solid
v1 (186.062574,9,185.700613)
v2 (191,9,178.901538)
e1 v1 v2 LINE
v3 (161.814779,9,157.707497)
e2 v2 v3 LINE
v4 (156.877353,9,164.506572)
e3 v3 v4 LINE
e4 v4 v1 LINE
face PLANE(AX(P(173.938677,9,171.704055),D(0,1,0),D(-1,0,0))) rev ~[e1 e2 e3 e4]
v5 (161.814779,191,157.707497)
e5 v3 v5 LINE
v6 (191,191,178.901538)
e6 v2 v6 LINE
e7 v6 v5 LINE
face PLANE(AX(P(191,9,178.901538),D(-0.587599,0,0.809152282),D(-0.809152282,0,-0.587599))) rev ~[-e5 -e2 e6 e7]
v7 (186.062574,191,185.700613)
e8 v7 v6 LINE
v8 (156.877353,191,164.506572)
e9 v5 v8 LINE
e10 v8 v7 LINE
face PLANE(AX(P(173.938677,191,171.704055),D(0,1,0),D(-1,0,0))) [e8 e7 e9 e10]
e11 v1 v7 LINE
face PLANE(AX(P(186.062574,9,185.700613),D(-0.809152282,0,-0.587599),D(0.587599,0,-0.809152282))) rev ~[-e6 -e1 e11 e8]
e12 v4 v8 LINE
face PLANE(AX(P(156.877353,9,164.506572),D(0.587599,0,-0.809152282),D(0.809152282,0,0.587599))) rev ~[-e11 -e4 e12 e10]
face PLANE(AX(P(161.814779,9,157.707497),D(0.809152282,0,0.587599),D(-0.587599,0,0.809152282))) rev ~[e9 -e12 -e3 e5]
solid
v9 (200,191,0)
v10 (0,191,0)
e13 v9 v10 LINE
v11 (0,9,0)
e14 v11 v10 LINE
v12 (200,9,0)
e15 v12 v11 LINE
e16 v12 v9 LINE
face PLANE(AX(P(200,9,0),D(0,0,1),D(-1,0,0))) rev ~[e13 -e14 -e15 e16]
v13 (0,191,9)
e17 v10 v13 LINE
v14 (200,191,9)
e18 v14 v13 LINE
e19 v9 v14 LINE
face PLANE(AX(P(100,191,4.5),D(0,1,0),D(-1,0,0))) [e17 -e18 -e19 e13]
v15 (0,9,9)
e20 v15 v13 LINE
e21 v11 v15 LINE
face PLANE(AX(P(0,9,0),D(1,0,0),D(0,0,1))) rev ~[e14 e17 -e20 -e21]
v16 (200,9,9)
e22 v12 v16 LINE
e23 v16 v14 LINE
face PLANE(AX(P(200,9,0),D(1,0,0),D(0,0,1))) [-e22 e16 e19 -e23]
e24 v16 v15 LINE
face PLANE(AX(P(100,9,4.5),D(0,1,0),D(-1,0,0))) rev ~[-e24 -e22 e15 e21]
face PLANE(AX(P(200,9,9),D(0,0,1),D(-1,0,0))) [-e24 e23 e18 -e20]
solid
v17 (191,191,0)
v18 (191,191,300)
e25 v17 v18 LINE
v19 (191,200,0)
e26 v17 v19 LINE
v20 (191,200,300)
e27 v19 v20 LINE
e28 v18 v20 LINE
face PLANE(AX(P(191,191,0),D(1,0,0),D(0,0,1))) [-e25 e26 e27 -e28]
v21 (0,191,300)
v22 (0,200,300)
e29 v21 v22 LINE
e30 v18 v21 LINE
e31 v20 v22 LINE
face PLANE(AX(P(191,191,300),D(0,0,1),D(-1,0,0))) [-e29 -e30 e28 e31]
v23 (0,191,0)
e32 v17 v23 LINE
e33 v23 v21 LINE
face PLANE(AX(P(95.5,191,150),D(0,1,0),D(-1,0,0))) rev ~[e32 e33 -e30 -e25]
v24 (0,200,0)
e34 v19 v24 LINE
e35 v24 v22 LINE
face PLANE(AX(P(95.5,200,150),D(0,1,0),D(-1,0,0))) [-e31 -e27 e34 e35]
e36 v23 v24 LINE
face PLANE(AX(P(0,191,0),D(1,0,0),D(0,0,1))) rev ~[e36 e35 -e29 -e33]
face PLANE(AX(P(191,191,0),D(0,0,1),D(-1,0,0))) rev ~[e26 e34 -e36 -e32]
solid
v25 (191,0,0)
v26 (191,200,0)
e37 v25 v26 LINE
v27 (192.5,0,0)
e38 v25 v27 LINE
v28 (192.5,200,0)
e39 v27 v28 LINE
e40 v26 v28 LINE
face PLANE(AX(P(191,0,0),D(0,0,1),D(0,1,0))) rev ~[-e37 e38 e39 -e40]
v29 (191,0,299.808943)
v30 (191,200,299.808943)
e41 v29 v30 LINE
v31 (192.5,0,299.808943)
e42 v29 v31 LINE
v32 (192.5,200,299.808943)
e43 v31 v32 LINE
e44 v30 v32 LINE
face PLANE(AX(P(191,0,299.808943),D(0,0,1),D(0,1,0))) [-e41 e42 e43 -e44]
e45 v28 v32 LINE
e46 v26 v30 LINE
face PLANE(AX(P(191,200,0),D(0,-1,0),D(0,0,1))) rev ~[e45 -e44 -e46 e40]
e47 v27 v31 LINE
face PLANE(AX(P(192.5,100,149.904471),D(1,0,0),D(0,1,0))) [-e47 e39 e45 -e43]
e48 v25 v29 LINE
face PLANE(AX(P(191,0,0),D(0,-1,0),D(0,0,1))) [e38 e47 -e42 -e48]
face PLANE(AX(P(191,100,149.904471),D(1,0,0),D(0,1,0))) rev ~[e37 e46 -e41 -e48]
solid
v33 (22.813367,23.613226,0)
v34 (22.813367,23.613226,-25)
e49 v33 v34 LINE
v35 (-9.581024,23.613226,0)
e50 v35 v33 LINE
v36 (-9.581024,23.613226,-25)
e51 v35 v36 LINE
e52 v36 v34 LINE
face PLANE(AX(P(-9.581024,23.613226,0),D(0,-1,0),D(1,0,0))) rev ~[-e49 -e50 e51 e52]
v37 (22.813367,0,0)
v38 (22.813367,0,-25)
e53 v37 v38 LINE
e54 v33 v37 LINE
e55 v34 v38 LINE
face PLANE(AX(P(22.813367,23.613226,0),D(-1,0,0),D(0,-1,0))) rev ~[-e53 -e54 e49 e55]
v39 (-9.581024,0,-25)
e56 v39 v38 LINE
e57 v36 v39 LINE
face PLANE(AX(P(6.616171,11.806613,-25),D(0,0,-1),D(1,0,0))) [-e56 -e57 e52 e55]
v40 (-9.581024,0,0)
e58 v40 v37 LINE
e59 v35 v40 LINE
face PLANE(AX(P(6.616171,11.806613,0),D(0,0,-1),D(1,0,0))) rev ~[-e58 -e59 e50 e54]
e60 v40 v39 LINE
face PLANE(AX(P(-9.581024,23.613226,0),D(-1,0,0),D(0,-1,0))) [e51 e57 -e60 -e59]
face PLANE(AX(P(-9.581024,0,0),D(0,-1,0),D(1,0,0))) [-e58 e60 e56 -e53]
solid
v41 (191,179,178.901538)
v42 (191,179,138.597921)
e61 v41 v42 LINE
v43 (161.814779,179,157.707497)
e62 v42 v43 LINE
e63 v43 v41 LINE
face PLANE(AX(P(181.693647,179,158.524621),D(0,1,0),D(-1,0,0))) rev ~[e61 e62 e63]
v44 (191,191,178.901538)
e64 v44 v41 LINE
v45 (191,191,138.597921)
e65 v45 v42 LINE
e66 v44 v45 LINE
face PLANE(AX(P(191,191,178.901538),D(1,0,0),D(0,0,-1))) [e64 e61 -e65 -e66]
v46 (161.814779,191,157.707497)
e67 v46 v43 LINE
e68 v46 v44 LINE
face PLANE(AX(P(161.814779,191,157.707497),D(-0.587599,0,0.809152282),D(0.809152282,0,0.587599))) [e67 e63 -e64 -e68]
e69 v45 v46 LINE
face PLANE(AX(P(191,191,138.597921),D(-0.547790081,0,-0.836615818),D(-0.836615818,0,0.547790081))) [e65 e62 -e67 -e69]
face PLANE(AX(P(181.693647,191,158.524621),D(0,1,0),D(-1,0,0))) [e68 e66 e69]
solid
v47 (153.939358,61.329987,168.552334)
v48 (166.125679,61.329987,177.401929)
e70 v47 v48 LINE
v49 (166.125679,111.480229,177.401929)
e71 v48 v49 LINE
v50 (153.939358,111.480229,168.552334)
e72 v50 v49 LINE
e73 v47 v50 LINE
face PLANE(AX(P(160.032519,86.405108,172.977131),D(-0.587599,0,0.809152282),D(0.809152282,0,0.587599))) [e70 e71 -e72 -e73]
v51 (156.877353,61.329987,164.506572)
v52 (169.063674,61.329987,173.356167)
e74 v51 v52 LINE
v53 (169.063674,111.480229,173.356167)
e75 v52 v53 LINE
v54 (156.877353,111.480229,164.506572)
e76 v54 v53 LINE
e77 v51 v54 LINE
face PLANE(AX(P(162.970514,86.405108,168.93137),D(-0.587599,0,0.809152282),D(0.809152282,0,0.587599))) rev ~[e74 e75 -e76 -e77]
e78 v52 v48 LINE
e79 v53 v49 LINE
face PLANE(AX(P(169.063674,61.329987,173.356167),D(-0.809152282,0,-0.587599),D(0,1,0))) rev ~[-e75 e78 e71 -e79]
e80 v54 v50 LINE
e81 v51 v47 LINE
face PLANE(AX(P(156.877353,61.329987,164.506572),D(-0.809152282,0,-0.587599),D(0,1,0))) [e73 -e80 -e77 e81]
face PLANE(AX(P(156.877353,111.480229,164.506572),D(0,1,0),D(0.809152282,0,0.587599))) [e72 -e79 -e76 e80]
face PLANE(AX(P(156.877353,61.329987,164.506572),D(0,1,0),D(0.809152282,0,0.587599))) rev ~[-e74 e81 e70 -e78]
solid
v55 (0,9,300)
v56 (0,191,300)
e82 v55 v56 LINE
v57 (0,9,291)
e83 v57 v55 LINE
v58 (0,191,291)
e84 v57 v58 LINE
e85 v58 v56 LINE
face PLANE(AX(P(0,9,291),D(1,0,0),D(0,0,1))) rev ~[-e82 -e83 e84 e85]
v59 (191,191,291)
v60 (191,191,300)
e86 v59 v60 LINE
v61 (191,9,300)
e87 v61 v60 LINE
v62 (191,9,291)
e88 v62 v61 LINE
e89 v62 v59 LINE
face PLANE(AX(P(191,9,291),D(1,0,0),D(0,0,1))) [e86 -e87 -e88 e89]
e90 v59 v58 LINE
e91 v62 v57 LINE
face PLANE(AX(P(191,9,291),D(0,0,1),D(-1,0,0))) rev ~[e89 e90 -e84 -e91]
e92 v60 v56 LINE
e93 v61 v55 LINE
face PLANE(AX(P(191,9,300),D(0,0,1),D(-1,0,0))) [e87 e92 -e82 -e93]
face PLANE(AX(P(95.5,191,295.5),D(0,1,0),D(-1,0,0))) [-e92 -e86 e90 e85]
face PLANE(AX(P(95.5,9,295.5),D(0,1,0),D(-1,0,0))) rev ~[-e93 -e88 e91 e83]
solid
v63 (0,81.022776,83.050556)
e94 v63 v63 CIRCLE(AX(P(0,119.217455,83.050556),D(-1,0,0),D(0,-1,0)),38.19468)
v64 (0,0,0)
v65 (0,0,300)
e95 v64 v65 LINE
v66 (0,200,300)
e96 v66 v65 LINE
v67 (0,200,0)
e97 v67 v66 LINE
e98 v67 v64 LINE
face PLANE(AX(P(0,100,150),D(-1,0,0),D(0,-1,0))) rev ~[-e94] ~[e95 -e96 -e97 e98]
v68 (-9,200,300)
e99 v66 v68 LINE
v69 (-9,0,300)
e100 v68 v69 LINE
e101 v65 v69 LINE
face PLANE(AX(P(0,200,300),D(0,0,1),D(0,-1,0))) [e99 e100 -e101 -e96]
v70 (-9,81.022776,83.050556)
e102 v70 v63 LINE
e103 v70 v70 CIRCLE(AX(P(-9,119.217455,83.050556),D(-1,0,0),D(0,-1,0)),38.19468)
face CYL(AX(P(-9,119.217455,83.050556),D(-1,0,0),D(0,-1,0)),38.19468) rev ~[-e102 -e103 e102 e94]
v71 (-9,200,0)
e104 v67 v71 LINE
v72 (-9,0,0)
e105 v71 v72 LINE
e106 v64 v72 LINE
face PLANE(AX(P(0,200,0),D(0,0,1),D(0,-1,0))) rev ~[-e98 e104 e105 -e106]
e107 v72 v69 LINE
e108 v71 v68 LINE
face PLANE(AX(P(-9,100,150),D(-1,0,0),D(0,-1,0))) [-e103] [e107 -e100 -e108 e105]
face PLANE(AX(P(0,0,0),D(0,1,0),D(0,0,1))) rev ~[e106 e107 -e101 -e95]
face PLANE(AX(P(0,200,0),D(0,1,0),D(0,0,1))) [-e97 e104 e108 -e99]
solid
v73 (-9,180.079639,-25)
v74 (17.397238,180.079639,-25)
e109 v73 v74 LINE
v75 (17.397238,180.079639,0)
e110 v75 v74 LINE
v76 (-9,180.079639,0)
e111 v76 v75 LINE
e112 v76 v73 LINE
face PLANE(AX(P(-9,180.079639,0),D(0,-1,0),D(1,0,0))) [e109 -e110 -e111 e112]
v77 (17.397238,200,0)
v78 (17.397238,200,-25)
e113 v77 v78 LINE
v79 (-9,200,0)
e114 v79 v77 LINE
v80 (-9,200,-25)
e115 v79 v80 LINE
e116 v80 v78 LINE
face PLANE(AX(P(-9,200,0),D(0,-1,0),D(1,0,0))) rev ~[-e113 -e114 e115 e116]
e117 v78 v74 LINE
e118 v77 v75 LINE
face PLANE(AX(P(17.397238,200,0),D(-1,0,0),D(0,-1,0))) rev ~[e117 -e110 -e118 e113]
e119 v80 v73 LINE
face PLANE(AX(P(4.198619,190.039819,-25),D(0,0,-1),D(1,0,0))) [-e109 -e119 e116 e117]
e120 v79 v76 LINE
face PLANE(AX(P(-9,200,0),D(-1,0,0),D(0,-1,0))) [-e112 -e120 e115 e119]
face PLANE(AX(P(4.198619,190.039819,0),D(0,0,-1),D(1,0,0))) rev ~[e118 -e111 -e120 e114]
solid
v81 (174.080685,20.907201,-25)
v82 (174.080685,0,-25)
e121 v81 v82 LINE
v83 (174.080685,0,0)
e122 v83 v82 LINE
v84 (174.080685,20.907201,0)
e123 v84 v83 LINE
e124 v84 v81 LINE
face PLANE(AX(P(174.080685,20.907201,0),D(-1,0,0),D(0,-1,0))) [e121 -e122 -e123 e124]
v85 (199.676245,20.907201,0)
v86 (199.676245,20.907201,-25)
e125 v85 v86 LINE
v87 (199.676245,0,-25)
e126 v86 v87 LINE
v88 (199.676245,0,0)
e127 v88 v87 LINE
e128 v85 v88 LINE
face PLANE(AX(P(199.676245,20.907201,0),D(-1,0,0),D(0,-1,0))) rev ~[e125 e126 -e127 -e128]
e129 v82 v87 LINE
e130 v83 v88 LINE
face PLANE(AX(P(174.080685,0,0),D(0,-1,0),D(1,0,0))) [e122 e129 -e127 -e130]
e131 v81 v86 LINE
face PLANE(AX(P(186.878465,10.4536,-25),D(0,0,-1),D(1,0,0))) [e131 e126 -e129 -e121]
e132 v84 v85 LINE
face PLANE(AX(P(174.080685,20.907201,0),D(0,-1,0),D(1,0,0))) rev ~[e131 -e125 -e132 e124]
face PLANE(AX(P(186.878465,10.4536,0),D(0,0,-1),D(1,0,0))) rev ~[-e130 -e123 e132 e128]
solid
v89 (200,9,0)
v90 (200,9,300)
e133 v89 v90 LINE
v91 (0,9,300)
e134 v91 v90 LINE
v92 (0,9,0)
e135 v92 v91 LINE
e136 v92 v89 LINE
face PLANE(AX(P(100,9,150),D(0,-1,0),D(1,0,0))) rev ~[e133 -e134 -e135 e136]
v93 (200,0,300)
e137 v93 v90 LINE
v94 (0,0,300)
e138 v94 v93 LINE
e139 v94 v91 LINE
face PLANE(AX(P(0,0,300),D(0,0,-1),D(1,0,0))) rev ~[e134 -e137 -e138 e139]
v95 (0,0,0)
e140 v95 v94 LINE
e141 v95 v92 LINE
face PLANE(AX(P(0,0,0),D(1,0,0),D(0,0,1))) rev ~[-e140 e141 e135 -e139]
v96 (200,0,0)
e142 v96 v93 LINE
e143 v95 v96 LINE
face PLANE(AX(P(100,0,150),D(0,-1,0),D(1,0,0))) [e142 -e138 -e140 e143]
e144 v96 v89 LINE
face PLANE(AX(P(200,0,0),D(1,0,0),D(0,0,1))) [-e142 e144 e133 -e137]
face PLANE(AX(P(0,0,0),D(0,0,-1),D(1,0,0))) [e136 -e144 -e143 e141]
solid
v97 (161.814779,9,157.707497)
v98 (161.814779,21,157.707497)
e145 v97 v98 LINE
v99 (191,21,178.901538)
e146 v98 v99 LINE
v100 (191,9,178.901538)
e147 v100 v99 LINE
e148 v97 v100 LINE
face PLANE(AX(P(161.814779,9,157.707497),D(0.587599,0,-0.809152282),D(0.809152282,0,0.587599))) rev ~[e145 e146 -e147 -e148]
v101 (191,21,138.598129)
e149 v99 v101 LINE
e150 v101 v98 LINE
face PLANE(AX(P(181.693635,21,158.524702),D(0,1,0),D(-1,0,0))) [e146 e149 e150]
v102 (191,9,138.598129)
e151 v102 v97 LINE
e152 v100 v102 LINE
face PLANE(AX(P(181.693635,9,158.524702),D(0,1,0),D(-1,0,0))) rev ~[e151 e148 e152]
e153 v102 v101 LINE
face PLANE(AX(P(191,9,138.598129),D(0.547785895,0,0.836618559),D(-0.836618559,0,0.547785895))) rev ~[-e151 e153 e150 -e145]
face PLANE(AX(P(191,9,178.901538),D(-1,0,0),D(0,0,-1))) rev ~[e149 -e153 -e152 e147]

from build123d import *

# Parameters (mm, degrees)
F0_W      = 200
F0_H      = 300
F1_DEPTH  = 9
F3_DEPTH  = 12
F5_DEPTH  = 182
F7_DEPTH  = 12
F8_W      = 15.0606025722
F8_H      = 50.1502417028
F9_DEPTH  = 5
F10_W     = 191
F10_H     = 9
F11_DEPTH = 182
F12_W     = 200
F12_H     = 9
F13_DEPTH = 182
F14_W     = 191
F14_H     = 300
F16_DEPTH = 9
F17_W     = 200
F17_H     = 299.8089425825
F18_DEPTH = 1.5
F19_W     = 200
F19_H     = 300
F20_DEPTH = 9
F21_R     = 38.194679826
F22_DEPTH = 30
F23_W     = 32.3943905532
F23_H     = 23.6132256687
F24_DEPTH = 25
F25_W     = 25.5955606699
F25_H     = 20.9072008729
F26_DEPTH = 25
F27_W     = 26.3972375542
F27_H     = 19.920361042
F28_DEPTH = 25


# Not quite as in the source:
# - a feature names something its author has since deleted; it is built from what else it names


with BuildPart() as f1:
    # F0 (on Front) → F1 (new body)
    with BuildSketch(Plane.XZ):
        with Locations((100, 150)):
            Rectangle(F0_W, F0_H)
    extrude(amount=-F1_DEPTH)


with BuildPart() as f3:
    # F2 (on face) → F3 (new body)
    with BuildSketch(Plane(origin=(0, 9, 0), x_dir=(-1, 0, 0), z_dir=(0, 1, 0))):
        Polygon((-161.8147794008, 157.7074974775), (-191, 178.9015382528), (-191, 138.5981291533), align=None)
    extrude(amount=F3_DEPTH)


with BuildPart() as f5:
    # F4 (on face) → F5 (new body)
    with BuildSketch(Plane(origin=(0, 9, 0), x_dir=(-1, 0, 0), z_dir=(0, 1, 0))):
        Polygon((-191, 178.9015382528), (-161.8147794008, 157.7074974775), (-156.8773534762, 164.5065721009), (-186.0625740754, 185.7006128762), align=None)
    extrude(amount=F5_DEPTH)


with BuildPart() as f7:
    # F6 (on face) → F7 (new body)
    with BuildSketch(Plane(origin=(0, 191, 0), x_dir=(-1, 0, 0), z_dir=(0, 1, 0))):
        Polygon((-161.8147794008, 157.7074974775), (-191, 178.9015382528), (-191, 138.597920537), align=None)
    extrude(amount=-F7_DEPTH)


with BuildPart() as f9:
    # F8 (on face) → F9 (new body)
    with BuildSketch(Plane(origin=(-24.0503636645, 0, 33.1185155525), x_dir=(0.8091522816, 0, 0.5875990004), z_dir=(-0.5875990004, 0, 0.8091522816))):
        with Locations((231.1318670975, 86.4051077515)):
            Rectangle(F8_W, F8_H)
    extrude(amount=F9_DEPTH)


with BuildPart() as f11:
    # F10 (on face) → F11 (new body)
    with BuildSketch(Plane(origin=(0, 9, 0), x_dir=(-1, 0, 0), z_dir=(0, 1, 0))):
        with Locations((-95.5, 295.5)):
            Rectangle(F10_W, F10_H)
    extrude(amount=F11_DEPTH)


with BuildPart() as f13:
    # F12 (on face) → F13 (new body)
    with BuildSketch(Plane(origin=(0, 9, 0), x_dir=(-1, 0, 0), z_dir=(0, 1, 0))):
        with Locations((-100, 4.5)):
            Rectangle(F12_W, F12_H)
    extrude(amount=F13_DEPTH)


with BuildPart() as f16:
    # F14 (on face) → F16 (new body)
    with BuildSketch(Plane(origin=(0, 191, 0), x_dir=(-1, 0, 0), z_dir=(0, 1, 0))):
        with Locations((-95.5, 150)):
            Rectangle(F14_W, F14_H)
    extrude(amount=F16_DEPTH)


with BuildPart() as f18:
    # F17 (on face) → F18 (new body)
    with BuildSketch(Plane.YZ.offset(191)):
        with Locations((100, 149.9044712912)):
            Rectangle(F17_W, F17_H)
    extrude(amount=F18_DEPTH)


with BuildPart() as f20:
    # F19 (on face) → F20 (new body)
    with BuildSketch(Plane(origin=(0, 0, 0), x_dir=(0, -1, 0), z_dir=(-1, 0, 0))):
        with Locations((-100, 150)):
            Rectangle(F19_W, F19_H)
    extrude(amount=F20_DEPTH)

    # F21 (on face) → F22 (cut)
    with BuildSketch(Plane(origin=(-9, 0, 0), x_dir=(0, -1, 0), z_dir=(-1, 0, 0))):
        with Locations((-119.2174553871, 83.0505564809)):
            Circle(F21_R)
    extrude(amount=-F22_DEPTH, mode=Mode.SUBTRACT)


with BuildPart() as f24:
    # F23 (on face) → F24 (new body)
    with BuildSketch(Plane(origin=(0, 0, 0), x_dir=(1, 0, 0), z_dir=(0, 0, -1))):
        with Locations((6.6161714494, -11.8066128343)):
            Rectangle(F23_W, F23_H)
    extrude(amount=F24_DEPTH)


with BuildPart() as f26:
    # F25 (on face) → F26 (new body)
    with BuildSketch(Plane(origin=(0, 0, 0), x_dir=(1, 0, 0), z_dir=(0, 0, -1))):
        with Locations((186.878465116, -10.4536004364)):
            Rectangle(F25_W, F25_H)
    extrude(amount=F26_DEPTH)


with BuildPart() as f28:
    # F27 (on face) → F28 (new body)
    with BuildSketch(Plane(origin=(0, 0, 0), x_dir=(1, 0, 0), z_dir=(0, 0, -1))):
        with Locations((4.1986187771, -190.039819479)):
            Rectangle(F27_W, F27_H)
    extrude(amount=F28_DEPTH)


solid = Compound([f1.part, f3.part, f5.part, f7.part, f9.part, f11.part, f13.part, f16.part, f18.part, f20.part, f24.part, f26.part, f28.part])
